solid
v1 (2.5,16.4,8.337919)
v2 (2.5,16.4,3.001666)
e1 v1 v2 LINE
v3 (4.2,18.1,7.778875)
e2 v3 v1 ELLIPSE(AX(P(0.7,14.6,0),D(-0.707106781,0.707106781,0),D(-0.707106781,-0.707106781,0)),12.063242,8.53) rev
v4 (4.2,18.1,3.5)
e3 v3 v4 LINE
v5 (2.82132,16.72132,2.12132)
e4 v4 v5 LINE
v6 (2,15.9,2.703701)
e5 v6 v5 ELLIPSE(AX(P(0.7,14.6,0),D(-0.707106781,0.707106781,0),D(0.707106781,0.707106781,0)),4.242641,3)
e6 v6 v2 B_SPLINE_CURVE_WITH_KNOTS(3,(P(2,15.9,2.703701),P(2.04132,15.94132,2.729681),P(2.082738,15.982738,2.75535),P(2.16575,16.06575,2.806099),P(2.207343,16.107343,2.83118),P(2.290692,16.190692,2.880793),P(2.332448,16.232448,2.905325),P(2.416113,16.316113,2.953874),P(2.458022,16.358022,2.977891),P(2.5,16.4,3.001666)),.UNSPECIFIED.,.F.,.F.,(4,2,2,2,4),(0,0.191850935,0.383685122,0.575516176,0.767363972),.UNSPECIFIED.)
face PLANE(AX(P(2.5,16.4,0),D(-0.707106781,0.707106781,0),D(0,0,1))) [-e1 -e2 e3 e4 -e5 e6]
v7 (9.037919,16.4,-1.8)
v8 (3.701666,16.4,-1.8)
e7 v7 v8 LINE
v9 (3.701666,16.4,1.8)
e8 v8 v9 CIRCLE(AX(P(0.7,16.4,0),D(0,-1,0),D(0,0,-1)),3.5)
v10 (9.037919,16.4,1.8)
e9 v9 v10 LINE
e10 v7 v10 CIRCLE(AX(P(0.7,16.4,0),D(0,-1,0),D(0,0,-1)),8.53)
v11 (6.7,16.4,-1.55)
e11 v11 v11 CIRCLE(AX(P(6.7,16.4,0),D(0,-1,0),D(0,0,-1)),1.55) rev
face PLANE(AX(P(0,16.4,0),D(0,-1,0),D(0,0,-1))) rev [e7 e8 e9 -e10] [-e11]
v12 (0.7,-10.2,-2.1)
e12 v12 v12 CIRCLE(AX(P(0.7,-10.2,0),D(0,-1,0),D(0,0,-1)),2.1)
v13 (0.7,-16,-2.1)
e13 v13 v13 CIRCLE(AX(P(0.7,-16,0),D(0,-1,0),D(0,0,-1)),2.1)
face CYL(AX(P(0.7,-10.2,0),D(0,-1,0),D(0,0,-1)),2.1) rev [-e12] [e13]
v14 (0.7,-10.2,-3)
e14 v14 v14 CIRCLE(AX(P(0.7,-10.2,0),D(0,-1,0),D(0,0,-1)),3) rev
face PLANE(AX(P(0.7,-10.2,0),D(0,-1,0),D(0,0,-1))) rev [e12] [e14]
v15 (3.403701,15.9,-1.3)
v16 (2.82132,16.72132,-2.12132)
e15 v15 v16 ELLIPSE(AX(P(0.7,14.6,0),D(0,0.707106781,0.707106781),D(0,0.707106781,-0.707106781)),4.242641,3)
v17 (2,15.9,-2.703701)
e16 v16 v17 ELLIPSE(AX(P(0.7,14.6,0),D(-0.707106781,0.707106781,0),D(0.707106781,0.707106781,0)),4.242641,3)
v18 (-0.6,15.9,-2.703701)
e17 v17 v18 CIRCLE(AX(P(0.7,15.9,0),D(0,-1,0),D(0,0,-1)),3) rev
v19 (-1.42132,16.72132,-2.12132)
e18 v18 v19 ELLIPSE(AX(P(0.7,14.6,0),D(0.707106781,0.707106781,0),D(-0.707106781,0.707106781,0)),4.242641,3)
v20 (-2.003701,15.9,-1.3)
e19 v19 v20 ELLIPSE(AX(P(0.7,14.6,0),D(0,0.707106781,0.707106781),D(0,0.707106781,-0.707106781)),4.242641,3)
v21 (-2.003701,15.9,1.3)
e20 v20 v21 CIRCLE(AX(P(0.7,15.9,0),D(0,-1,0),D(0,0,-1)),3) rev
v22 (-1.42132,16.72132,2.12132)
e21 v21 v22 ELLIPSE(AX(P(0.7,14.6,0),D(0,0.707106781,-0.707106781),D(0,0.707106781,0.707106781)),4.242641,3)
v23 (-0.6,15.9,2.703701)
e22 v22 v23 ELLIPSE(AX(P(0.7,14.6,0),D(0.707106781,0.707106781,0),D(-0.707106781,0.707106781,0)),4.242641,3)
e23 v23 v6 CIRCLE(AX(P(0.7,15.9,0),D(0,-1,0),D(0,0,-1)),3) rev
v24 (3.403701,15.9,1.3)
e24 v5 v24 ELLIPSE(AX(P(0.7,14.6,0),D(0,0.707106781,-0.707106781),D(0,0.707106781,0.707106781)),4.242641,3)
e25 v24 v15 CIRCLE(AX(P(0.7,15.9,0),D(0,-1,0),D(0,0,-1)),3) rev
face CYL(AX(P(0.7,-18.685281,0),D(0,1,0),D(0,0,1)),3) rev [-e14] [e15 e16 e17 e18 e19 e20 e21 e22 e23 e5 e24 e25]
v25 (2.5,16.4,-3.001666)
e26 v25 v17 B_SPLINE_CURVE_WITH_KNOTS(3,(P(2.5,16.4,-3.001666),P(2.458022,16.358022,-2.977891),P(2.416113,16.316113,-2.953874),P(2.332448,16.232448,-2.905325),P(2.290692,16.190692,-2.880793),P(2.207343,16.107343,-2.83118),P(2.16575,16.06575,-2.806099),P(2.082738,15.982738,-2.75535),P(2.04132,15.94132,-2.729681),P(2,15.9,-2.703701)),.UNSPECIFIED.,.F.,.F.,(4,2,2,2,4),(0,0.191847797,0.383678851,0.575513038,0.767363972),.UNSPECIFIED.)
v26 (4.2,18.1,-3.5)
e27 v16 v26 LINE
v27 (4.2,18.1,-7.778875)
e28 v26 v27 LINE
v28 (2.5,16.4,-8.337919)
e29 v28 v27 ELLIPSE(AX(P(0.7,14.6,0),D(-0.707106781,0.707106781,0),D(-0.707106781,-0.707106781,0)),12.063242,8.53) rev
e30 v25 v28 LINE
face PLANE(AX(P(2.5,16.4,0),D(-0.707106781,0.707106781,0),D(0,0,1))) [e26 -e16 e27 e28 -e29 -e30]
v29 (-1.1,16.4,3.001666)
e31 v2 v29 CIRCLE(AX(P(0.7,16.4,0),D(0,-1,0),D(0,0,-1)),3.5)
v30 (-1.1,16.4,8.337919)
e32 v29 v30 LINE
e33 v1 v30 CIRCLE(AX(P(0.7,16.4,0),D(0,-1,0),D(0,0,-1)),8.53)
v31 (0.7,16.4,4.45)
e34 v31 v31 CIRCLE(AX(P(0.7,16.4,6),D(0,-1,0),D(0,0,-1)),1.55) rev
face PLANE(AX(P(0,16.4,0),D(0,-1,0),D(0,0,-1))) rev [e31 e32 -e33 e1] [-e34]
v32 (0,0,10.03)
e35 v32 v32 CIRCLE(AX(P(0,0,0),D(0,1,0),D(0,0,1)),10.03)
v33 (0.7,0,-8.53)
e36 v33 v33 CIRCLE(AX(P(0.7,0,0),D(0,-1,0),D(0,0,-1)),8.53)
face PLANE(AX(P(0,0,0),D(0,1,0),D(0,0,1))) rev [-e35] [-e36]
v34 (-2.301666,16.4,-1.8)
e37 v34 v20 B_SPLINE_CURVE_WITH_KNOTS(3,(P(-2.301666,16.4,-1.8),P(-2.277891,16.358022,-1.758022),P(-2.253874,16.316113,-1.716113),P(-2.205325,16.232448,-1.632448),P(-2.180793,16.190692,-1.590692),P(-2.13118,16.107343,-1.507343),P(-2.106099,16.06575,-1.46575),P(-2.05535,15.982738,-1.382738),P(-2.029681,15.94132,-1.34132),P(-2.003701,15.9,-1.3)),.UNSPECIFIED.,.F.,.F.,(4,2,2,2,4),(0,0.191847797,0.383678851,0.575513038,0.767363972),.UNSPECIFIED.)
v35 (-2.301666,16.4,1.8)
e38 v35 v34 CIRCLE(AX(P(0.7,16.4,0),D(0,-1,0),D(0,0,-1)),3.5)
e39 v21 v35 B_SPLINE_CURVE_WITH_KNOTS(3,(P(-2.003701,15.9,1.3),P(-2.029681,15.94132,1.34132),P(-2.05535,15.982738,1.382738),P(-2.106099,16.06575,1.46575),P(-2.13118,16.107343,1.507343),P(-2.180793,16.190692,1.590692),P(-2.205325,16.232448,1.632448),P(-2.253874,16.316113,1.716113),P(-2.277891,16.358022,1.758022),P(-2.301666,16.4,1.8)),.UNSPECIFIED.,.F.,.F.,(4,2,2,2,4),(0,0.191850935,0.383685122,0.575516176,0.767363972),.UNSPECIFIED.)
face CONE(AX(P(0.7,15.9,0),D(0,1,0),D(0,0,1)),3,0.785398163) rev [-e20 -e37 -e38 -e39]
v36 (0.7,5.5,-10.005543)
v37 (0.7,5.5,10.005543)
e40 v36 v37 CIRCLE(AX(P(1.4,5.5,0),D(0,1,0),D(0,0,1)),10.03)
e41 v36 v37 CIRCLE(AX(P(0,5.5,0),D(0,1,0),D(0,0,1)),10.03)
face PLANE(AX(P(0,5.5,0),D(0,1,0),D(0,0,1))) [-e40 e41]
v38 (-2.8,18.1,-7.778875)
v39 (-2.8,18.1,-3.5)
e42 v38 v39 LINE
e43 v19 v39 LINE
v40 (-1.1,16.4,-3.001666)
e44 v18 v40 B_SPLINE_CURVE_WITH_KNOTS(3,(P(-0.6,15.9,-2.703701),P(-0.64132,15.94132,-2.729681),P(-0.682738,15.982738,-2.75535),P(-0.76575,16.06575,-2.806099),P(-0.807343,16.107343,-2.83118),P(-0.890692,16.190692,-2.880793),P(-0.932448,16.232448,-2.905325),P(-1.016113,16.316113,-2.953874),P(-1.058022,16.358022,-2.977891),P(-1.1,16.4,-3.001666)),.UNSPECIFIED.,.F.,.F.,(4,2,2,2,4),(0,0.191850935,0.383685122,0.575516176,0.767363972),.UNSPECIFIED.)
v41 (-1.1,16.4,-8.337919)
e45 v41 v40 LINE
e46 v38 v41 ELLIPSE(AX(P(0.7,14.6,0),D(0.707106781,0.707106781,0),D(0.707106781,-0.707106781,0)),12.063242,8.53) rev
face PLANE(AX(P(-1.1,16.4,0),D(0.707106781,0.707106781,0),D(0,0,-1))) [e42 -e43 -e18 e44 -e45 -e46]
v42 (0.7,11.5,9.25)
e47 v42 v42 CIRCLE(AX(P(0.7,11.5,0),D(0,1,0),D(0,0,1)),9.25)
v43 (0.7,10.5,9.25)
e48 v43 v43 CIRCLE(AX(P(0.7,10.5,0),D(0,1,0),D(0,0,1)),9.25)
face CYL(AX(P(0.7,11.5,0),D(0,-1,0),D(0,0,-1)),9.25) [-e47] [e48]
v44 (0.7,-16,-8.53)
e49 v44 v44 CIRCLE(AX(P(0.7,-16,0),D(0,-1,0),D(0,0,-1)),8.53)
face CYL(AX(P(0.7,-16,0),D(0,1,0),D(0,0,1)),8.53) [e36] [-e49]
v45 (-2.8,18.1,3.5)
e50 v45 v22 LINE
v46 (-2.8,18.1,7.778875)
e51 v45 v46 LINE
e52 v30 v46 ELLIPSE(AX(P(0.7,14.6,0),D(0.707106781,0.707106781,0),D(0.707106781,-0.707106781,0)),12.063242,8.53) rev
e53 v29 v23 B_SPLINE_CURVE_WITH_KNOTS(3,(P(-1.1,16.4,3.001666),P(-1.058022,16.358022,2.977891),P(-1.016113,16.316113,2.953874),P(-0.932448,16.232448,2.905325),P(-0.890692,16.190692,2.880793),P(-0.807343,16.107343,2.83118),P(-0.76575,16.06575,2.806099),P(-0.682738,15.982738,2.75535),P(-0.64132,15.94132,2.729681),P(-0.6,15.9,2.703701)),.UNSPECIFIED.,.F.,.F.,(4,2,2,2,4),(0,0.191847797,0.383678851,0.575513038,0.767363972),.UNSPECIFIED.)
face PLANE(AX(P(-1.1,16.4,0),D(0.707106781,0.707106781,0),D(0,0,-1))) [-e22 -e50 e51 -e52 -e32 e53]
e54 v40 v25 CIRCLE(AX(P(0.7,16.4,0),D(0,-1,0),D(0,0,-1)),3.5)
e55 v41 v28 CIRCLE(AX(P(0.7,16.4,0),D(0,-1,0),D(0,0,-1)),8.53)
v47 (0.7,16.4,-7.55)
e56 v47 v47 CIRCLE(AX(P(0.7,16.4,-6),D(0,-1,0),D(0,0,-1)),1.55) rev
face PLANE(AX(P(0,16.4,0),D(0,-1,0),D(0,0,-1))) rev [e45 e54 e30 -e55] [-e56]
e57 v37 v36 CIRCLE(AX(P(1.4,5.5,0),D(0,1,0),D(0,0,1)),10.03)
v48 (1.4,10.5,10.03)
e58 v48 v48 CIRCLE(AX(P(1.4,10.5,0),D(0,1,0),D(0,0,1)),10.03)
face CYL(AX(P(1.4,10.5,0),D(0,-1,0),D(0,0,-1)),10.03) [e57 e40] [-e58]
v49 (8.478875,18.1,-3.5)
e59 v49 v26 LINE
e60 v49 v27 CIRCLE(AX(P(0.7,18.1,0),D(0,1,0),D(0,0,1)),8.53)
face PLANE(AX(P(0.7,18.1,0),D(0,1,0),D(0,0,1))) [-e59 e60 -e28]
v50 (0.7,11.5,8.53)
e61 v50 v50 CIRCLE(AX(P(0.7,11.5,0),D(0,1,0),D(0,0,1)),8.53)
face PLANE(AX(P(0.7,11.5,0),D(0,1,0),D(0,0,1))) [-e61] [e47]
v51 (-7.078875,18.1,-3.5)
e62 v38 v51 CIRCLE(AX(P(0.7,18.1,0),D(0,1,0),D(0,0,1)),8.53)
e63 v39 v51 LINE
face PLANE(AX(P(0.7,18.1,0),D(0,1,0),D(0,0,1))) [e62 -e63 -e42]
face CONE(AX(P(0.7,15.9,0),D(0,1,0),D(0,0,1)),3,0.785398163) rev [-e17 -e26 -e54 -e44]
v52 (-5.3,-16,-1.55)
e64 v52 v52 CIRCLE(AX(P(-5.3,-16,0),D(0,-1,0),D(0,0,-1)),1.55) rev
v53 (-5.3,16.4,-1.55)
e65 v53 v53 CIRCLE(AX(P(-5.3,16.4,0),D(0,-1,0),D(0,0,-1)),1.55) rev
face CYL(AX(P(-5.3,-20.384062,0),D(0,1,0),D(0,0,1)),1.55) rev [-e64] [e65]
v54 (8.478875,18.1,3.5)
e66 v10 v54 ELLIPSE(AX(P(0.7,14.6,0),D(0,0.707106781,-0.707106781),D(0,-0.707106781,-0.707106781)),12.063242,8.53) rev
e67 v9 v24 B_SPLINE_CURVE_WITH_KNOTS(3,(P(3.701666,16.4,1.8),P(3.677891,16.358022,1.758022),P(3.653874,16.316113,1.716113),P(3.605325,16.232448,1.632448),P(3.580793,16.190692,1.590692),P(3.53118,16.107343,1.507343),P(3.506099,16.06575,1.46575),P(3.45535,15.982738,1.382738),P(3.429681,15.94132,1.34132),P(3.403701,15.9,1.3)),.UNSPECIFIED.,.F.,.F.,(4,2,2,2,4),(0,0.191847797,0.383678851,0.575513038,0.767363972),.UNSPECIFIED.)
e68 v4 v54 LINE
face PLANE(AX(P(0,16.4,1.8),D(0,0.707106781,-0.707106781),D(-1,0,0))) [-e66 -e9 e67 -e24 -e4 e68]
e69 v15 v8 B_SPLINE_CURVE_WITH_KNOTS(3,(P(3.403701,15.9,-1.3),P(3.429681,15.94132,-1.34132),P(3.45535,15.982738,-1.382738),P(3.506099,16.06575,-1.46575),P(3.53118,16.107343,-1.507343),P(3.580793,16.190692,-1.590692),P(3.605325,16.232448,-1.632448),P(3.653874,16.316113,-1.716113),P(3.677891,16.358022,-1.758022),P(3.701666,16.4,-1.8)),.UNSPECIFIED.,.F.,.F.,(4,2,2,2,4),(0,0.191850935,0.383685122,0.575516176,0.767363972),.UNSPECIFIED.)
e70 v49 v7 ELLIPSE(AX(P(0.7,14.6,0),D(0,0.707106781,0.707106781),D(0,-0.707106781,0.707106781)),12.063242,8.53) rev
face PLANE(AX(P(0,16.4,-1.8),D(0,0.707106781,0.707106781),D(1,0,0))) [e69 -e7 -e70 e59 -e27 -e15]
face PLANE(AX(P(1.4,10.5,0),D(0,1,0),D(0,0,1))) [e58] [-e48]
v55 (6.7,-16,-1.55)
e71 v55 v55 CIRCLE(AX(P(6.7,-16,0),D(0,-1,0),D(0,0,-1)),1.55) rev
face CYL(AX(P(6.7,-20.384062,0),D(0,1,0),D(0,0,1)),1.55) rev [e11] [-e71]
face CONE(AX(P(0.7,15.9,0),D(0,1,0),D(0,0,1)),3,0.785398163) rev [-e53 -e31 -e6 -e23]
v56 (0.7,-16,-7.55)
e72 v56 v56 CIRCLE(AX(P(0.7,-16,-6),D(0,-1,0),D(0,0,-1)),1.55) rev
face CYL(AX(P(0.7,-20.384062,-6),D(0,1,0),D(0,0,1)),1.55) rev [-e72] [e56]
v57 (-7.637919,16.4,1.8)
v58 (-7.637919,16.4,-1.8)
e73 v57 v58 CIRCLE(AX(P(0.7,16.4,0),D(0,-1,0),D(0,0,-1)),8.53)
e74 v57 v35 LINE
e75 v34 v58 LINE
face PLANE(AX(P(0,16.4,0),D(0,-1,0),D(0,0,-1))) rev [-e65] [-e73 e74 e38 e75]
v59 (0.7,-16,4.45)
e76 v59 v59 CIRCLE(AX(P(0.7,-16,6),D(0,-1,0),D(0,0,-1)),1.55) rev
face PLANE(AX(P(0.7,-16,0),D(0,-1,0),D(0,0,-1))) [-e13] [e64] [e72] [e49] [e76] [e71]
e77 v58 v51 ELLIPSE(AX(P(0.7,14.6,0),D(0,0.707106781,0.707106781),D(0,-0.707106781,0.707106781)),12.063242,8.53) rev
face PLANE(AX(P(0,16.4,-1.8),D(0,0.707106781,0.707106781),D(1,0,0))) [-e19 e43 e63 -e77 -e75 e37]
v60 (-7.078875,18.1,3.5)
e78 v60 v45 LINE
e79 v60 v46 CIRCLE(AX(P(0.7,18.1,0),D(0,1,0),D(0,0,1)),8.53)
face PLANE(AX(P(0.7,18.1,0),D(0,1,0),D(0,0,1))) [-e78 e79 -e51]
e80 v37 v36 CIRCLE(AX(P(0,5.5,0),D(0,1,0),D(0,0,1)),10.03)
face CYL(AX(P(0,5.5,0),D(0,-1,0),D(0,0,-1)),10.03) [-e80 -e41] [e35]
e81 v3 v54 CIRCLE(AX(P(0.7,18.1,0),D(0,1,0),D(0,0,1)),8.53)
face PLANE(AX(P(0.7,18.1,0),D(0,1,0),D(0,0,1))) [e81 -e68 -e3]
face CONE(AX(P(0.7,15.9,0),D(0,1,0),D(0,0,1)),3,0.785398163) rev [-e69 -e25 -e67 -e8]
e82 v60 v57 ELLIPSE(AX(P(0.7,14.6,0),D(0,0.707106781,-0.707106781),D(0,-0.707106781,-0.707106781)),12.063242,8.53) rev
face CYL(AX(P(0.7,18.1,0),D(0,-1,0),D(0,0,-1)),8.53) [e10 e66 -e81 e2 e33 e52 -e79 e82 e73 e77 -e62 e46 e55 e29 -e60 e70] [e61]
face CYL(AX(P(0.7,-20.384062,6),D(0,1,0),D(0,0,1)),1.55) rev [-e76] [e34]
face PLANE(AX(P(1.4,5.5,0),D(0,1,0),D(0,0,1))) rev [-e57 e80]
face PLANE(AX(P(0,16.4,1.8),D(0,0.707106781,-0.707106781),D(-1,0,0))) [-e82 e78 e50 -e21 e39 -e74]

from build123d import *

# Parameters (mm, degrees)
SKETCH1_R            = 10.03
BOSS_EXTRUDE11_DEPTH = 5.5
SKETCH20_R           = 10.03
BOSS_EXTRUDE12_DEPTH = 5
SKETCH21_R           = 9.25
BOSS_EXTRUDE13_DEPTH = 1
SKETCH22_R           = 8.53
BOSS_EXTRUDE14_DEPTH = 6.6
BOSS_EXTRUDE15_START = 16
SKETCH30_R           = 8.53
BOSS_EXTRUDE15_DEPTH = 16
SKETCH31_R           = 1.55
CUT_EXTRUDE12_DEPTH  = 34.1
SKETCH33_R           = 2.1
CUT_EXTRUDE14_DEPTH  = 5.8
SKETCH36_R           = 3
CUT_EXTRUDE18_DEPTH  = 28.3
SKETCH37_W           = 9.5
SKETCH37_H           = 7
CUT_EXTRUDE19_DEPTH  = 1.7
CIRPATTERN1_COUNT    = 4
CHAMFER1_SIZE        = 1.7
CHAMFER2_SIZE        = 0.5


with BuildPart() as part:
    # Sketch1 → Boss-Extrude11 (new body)
    with BuildSketch(Plane(origin=(0, 0, 0), x_dir=(1, 0, 0), z_dir=(0, 1, 0))):
        with Locations(Location((0, 0, 0), (0, 0, 270))):
            Circle(SKETCH1_R)
    extrude(amount=BOSS_EXTRUDE11_DEPTH)

    # Sketch20 → Boss-Extrude12 (add)
    with BuildSketch(Plane(origin=(0, 5.5, 0), x_dir=(1, 0, 0), z_dir=(0, 1, 0))):
        with Locations(Location((1.4, 0, 0), (0, 0, 94.001961682))):
            Circle(SKETCH20_R)
    extrude(amount=BOSS_EXTRUDE12_DEPTH)

    # Sketch21 → Boss-Extrude13 (add)
    with BuildSketch(Plane(origin=(0, 10.5, 0), x_dir=(1, 0, 0), z_dir=(0, 1, 0))):
        with Locations(Location((0.7, 0, 0), (0, 0, 270))):
            Circle(SKETCH21_R)
    extrude(amount=BOSS_EXTRUDE13_DEPTH)

    # Sketch22 → Boss-Extrude14 (add)
    with BuildSketch(Plane(origin=(0, 11.5, 0), x_dir=(1, 0, 0), z_dir=(0, 1, 0))):
        with Locations(Location((0.7, 0, 0), (0, 0, 270))):
            Circle(SKETCH22_R)
    extrude(amount=BOSS_EXTRUDE14_DEPTH)

    # Sketch30 → Boss-Extrude15 (add)
    with BuildSketch(Plane.XZ.offset(BOSS_EXTRUDE15_START)):
        with Locations(Location((0.7, 0, 0), (0, 0, 90))):
            Circle(SKETCH30_R)
    extrude(amount=-BOSS_EXTRUDE15_DEPTH)

    # Sketch31 → Cut-Extrude12 (cut)
    with BuildSketch(Plane(origin=(0, 18.1, 0), x_dir=(1, 0, 0), z_dir=(0, 1, 0))):
        with Locations(Location((6.7, 0, 0), (0, 0, 270))):
            Circle(SKETCH31_R)
    cut_extrude12 = extrude(amount=-CUT_EXTRUDE12_DEPTH, mode=Mode.SUBTRACT)

    # Sketch33 → Cut-Extrude14 (cut)
    with BuildSketch(Plane.XZ.offset(16)):
        with Locations(Location((0.7, 0, 0), (0, 0, 270))):
            Circle(SKETCH33_R)
    extrude(amount=-CUT_EXTRUDE14_DEPTH, mode=Mode.SUBTRACT)

    # Sketch36 → Cut-Extrude18 (cut)
    with BuildSketch(Plane(origin=(0, 18.1, 0), x_dir=(1, 0, 0), z_dir=(0, 1, 0))):
        with Locations(Location((0.7, 0, 0), (0, 0, 270))):
            Circle(SKETCH36_R)
    extrude(amount=-CUT_EXTRUDE18_DEPTH, mode=Mode.SUBTRACT)

    # Sketch37 → Cut-Extrude19 (cut)
    with BuildSketch(Plane(origin=(0, 18.1, 0), x_dir=(1, 0, 0), z_dir=(0, 1, 0))):
        with Locations((5.45, 0)):
            Rectangle(SKETCH37_W, SKETCH37_H)
    cut_extrude19 = extrude(amount=-CUT_EXTRUDE19_DEPTH, mode=Mode.SUBTRACT)

    # CirPattern1: Cut-Extrude12, Cut-Extrude19 ×4 about axis
    cirpattern1_axis = Axis((0.7, 0, 0), (0, 1, 0))
    add([cut_extrude12.rotate(cirpattern1_axis, i * 360 / CIRPATTERN1_COUNT) for i in range(1, CIRPATTERN1_COUNT)], mode=Mode.SUBTRACT)
    add([cut_extrude19.rotate(cirpattern1_axis, i * 360 / CIRPATTERN1_COUNT) for i in range(1, CIRPATTERN1_COUNT)], mode=Mode.SUBTRACT)

    # Chamfer1
    # the kernel refuses this chamfer: 1.7 mm, written as the material it adds along each edge
    with BuildSketch(Plane(origin=(12.85073632, 16.4, -3.5), x_dir=(0, 0.9996219169112968, -0.027495876610586365), z_dir=(-1, 0, 0))) as chamfer1_piece_1_section:
        Polygon((CHAMFER1_SIZE * 0.999621916911, -CHAMFER1_SIZE * 0.0274958766106), (-CHAMFER1_SIZE * 0.0274958766106, -CHAMFER1_SIZE * 0.999621916911), (0, 0), align=None)
    chamfer1_piece_1 = extrude(amount=8.65073632, mode=Mode.PRIVATE)
    chamfer1_piece_1 = chamfer1_piece_1 & Plane(origin=(0.7, 16.951076754, 0), x_dir=(0, 0, 1), z_dir=(0, -1, 0)) * Cylinder(8.53, 25, mode=Mode.PRIVATE)
    chamfer1_piece_1 = split(chamfer1_piece_1, bisect_by=Plane(origin=(6.450066767, 18.1, -2.924017163), z_dir=(0, -1, 0)), keep=Keep.TOP, mode=Mode.PRIVATE)
    add(chamfer1_piece_1)
    with BuildSketch(Plane(origin=(4.2, 16.4, 3.5), x_dir=(0, 0.9996219169112968, 0.027495876610581792), z_dir=(1, 0, 0))) as chamfer1_piece_2_section:
        Polygon((CHAMFER1_SIZE * 0.999621916911, -CHAMFER1_SIZE * 0.0274958766106), (-CHAMFER1_SIZE * 0.0274958766106, -CHAMFER1_SIZE * 0.999621916911), (0, 0), align=None)
    chamfer1_piece_2 = extrude(amount=8.65073632, mode=Mode.PRIVATE)
    chamfer1_piece_2 = chamfer1_piece_2 & Plane(origin=(0.7, 16.951076754, 0), x_dir=(0, 0, 1), z_dir=(0, -1, 0)) * Cylinder(8.53, 25, mode=Mode.PRIVATE)
    chamfer1_piece_2 = split(chamfer1_piece_2, bisect_by=Plane(origin=(6.450066768, 18.1, 2.924017163), z_dir=(0, -1, 0)), keep=Keep.TOP, mode=Mode.PRIVATE)
    add(chamfer1_piece_2)
    with BuildSketch(Plane(origin=(-2.8, 16.4, -12.15073632), x_dir=(-0.027495876610586365, 0.9996219169112968, 0), z_dir=(0, 0, 1))) as chamfer1_piece_3_section:
        Polygon((CHAMFER1_SIZE * 0.999621916911, -CHAMFER1_SIZE * 0.0274958766106), (-CHAMFER1_SIZE * 0.0274958766106, -CHAMFER1_SIZE * 0.999621916911), (0, 0), align=None)
    chamfer1_piece_3 = extrude(amount=8.65073632, mode=Mode.PRIVATE)
    chamfer1_piece_3 = chamfer1_piece_3 & Plane(origin=(0.7, 16.951076754, 0), x_dir=(0, 0, 1), z_dir=(0, -1, 0)) * Cylinder(8.53, 25, mode=Mode.PRIVATE)
    chamfer1_piece_3 = split(chamfer1_piece_3, bisect_by=Plane(origin=(-2.224017163, 18.1, -5.750066767), z_dir=(0, -1, 0)), keep=Keep.TOP, mode=Mode.PRIVATE)
    add(chamfer1_piece_3)
    with BuildSketch(Plane(origin=(-2.8, 16.4, -3.5), x_dir=(0, 0.9996219169112968, -0.027495876610586365), z_dir=(-1, 0, 0))) as chamfer1_piece_4_section:
        Polygon((CHAMFER1_SIZE * 0.999621916911, -CHAMFER1_SIZE * 0.0274958766106), (-CHAMFER1_SIZE * 0.0274958766106, -CHAMFER1_SIZE * 0.999621916911), (0, 0), align=None)
    chamfer1_piece_4 = extrude(amount=8.65073632, mode=Mode.PRIVATE)
    chamfer1_piece_4 = chamfer1_piece_4 & Plane(origin=(0.7, 16.951076754, 0), x_dir=(0, 0, 1), z_dir=(0, -1, 0)) * Cylinder(8.53, 25, mode=Mode.PRIVATE)
    chamfer1_piece_4 = split(chamfer1_piece_4, bisect_by=Plane(origin=(-5.050066768, 18.1, -2.924017163), z_dir=(0, -1, 0)), keep=Keep.TOP, mode=Mode.PRIVATE)
    add(chamfer1_piece_4)
    with BuildSketch(Plane(origin=(-11.45073632, 16.4, 3.5), x_dir=(0, 0.9996219169112968, 0.027495876610586365), z_dir=(1, 0, 0))) as chamfer1_piece_5_section:
        Polygon((CHAMFER1_SIZE * 0.999621916911, -CHAMFER1_SIZE * 0.0274958766106), (-CHAMFER1_SIZE * 0.0274958766106, -CHAMFER1_SIZE * 0.999621916911), (0, 0), align=None)
    chamfer1_piece_5 = extrude(amount=8.65073632, mode=Mode.PRIVATE)
    chamfer1_piece_5 = chamfer1_piece_5 & Plane(origin=(0.7, 16.951076754, 0), x_dir=(0, 0, 1), z_dir=(0, -1, 0)) * Cylinder(8.53, 25, mode=Mode.PRIVATE)
    chamfer1_piece_5 = split(chamfer1_piece_5, bisect_by=Plane(origin=(-5.050066767, 18.1, 2.924017163), z_dir=(0, -1, 0)), keep=Keep.TOP, mode=Mode.PRIVATE)
    add(chamfer1_piece_5)
    with BuildSketch(Plane(origin=(-2.8, 16.4, 3.5), x_dir=(-0.027495876610586365, 0.9996219169112968, 0), z_dir=(0, 0, 1))) as chamfer1_piece_6_section:
        Polygon((CHAMFER1_SIZE * 0.999621916911, -CHAMFER1_SIZE * 0.0274958766106), (-CHAMFER1_SIZE * 0.0274958766106, -CHAMFER1_SIZE * 0.999621916911), (0, 0), align=None)
    chamfer1_piece_6 = extrude(amount=8.65073632, mode=Mode.PRIVATE)
    chamfer1_piece_6 = chamfer1_piece_6 & Plane(origin=(0.7, 16.951076754, 0), x_dir=(0, 0, 1), z_dir=(0, -1, 0)) * Cylinder(8.53, 25, mode=Mode.PRIVATE)
    chamfer1_piece_6 = split(chamfer1_piece_6, bisect_by=Plane(origin=(-2.224017163, 18.1, 5.750066768), z_dir=(0, -1, 0)), keep=Keep.TOP, mode=Mode.PRIVATE)
    add(chamfer1_piece_6)
    with BuildSketch(Plane(origin=(4.2, 16.4, 12.15073632), x_dir=(0.027495876610586365, 0.9996219169112968, 0), z_dir=(0, 0, -1))) as chamfer1_piece_7_section:
        Polygon((CHAMFER1_SIZE * 0.999621916911, -CHAMFER1_SIZE * 0.0274958766106), (-CHAMFER1_SIZE * 0.0274958766106, -CHAMFER1_SIZE * 0.999621916911), (0, 0), align=None)
    chamfer1_piece_7 = extrude(amount=8.65073632, mode=Mode.PRIVATE)
    chamfer1_piece_7 = chamfer1_piece_7 & Plane(origin=(0.7, 16.951076754, 0), x_dir=(0, 0, 1), z_dir=(0, -1, 0)) * Cylinder(8.53, 25, mode=Mode.PRIVATE)
    chamfer1_piece_7 = split(chamfer1_piece_7, bisect_by=Plane(origin=(3.624017163, 18.1, 5.750066767), z_dir=(0, -1, 0)), keep=Keep.TOP, mode=Mode.PRIVATE)
    add(chamfer1_piece_7)
    with BuildSketch(Plane(origin=(4.2, 16.4, -3.5), x_dir=(0.027495876610586365, 0.9996219169112968, 0), z_dir=(0, 0, -1))) as chamfer1_piece_8_section:
        Polygon((CHAMFER1_SIZE * 0.999621916911, -CHAMFER1_SIZE * 0.0274958766106), (-CHAMFER1_SIZE * 0.0274958766106, -CHAMFER1_SIZE * 0.999621916911), (0, 0), align=None)
    chamfer1_piece_8 = extrude(amount=8.65073632, mode=Mode.PRIVATE)
    chamfer1_piece_8 = chamfer1_piece_8 & Plane(origin=(0.7, 16.951076754, 0), x_dir=(0, 0, 1), z_dir=(0, -1, 0)) * Cylinder(8.53, 25, mode=Mode.PRIVATE)
    chamfer1_piece_8 = split(chamfer1_piece_8, bisect_by=Plane(origin=(3.624017163, 18.1, -5.750066768), z_dir=(0, -1, 0)), keep=Keep.TOP, mode=Mode.PRIVATE)
    add(chamfer1_piece_8)
    with BuildSketch(Plane(origin=(12.85073632, 16.4, -3.5), x_dir=(0, 0.9996219169112968, -0.027495876610586365), z_dir=(-1, 0, 0))) as chamfer1_piece_9a_section:
        Polygon((CHAMFER1_SIZE * 0.999621916911, -CHAMFER1_SIZE * 0.0274958766106), (-CHAMFER1_SIZE * 0.0274958766106, -CHAMFER1_SIZE * 0.999621916911), (0, 0), align=None)
    chamfer1_piece_9a = extrude(amount=13.022597399, mode=Mode.PRIVATE)
    chamfer1_piece_9a = split(chamfer1_piece_9a, bisect_by=Plane(origin=(2.33024723, 18.1, -3.085534958), z_dir=(0, -1, 0)), keep=Keep.TOP, mode=Mode.PRIVATE)
    chamfer1_piece_9a = split(chamfer1_piece_9a, bisect_by=Plane(origin=(4.2, 17.035605809, -3.085534958), z_dir=(-1, 0, 0)), keep=Keep.TOP, mode=Mode.PRIVATE)
    chamfer1_piece_9a = chamfer1_piece_9a - Plane(origin=(0.7, 17.035605809, 0), x_dir=(0, 0, 1), z_dir=(0, 1, 0)) * Cylinder(3, 33, mode=Mode.PRIVATE)
    with BuildSketch(Plane(origin=(4.2, 16.4, 0.87186108), x_dir=(0.027495876610586365, 0.9996219169112968, 0), z_dir=(0, 0, -1))) as chamfer1_piece_9b_section:
        Polygon((CHAMFER1_SIZE * 0.999621916911, -CHAMFER1_SIZE * 0.0274958766106), (-CHAMFER1_SIZE * 0.0274958766106, -CHAMFER1_SIZE * 0.999621916911), (0, 0), align=None)
    chamfer1_piece_9b = extrude(amount=13.022597399, mode=Mode.PRIVATE)
    chamfer1_piece_9b = split(chamfer1_piece_9b, bisect_by=Plane(origin=(3.785535078, 17.035605902, -3.5), z_dir=(0, 0, 1)), keep=Keep.TOP, mode=Mode.PRIVATE)
    chamfer1_piece_9b = split(chamfer1_piece_9b, bisect_by=Plane(origin=(3.785535078, 18.1, -1.630247283), z_dir=(0, -1, 0)), keep=Keep.TOP, mode=Mode.PRIVATE)
    chamfer1_piece_9b = chamfer1_piece_9b - Plane(origin=(0.7, 17.035605902, 0), x_dir=(0, 0, 1), z_dir=(0, 1, 0)) * Cylinder(3, 33, mode=Mode.PRIVATE)
    chamfer1_piece_9 = chamfer1_piece_9a & chamfer1_piece_9b
    add(chamfer1_piece_9)
    with BuildSketch(Plane(origin=(4.2, 16.4, 12.15073632), x_dir=(0.027495876610586365, 0.9996219169112968, 0), z_dir=(0, 0, -1))) as chamfer1_piece_10a_section:
        Polygon((CHAMFER1_SIZE * 0.999621916911, -CHAMFER1_SIZE * 0.0274958766106), (-CHAMFER1_SIZE * 0.0274958766106, -CHAMFER1_SIZE * 0.999621916911), (0, 0), align=None)
    chamfer1_piece_10a = extrude(amount=13.022597399, mode=Mode.PRIVATE)
    chamfer1_piece_10a = split(chamfer1_piece_10a, bisect_by=Plane(origin=(3.785534958, 18.1, 1.63024723), z_dir=(0, -1, 0)), keep=Keep.TOP, mode=Mode.PRIVATE)
    chamfer1_piece_10a = split(chamfer1_piece_10a, bisect_by=Plane(origin=(3.785534958, 17.035605809, 3.5), z_dir=(0, 0, -1)), keep=Keep.TOP, mode=Mode.PRIVATE)
    chamfer1_piece_10a = chamfer1_piece_10a - Plane(origin=(0.7, 17.035605809, 0), x_dir=(0, 0, 1), z_dir=(0, 1, 0)) * Cylinder(3, 33, mode=Mode.PRIVATE)
    with BuildSketch(Plane(origin=(-0.17186108, 16.4, 3.5), x_dir=(0, 0.9996219169112968, 0.027495876610586365), z_dir=(1, 0, 0))) as chamfer1_piece_10b_section:
        Polygon((CHAMFER1_SIZE * 0.999621916911, -CHAMFER1_SIZE * 0.0274958766106), (-CHAMFER1_SIZE * 0.0274958766106, -CHAMFER1_SIZE * 0.999621916911), (0, 0), align=None)
    chamfer1_piece_10b = extrude(amount=13.022597399, mode=Mode.PRIVATE)
    chamfer1_piece_10b = split(chamfer1_piece_10b, bisect_by=Plane(origin=(4.2, 17.035605903, 3.08553508), z_dir=(-1, 0, 0)), keep=Keep.TOP, mode=Mode.PRIVATE)
    chamfer1_piece_10b = split(chamfer1_piece_10b, bisect_by=Plane(origin=(2.330247274, 18.1, 3.08553508), z_dir=(0, -1, 0)), keep=Keep.TOP, mode=Mode.PRIVATE)
    chamfer1_piece_10b = chamfer1_piece_10b - Plane(origin=(0.7, 17.035605903, 0), x_dir=(0, 0, 1), z_dir=(0, 1, 0)) * Cylinder(3, 33, mode=Mode.PRIVATE)
    chamfer1_piece_10 = chamfer1_piece_10a & chamfer1_piece_10b
    add(chamfer1_piece_10)
    with BuildSketch(Plane(origin=(-2.8, 16.4, -12.15073632), x_dir=(-0.027495876610586365, 0.9996219169112968, 0), z_dir=(0, 0, 1))) as chamfer1_piece_11a_section:
        Polygon((CHAMFER1_SIZE * 0.999621916911, -CHAMFER1_SIZE * 0.0274958766106), (-CHAMFER1_SIZE * 0.0274958766106, -CHAMFER1_SIZE * 0.999621916911), (0, 0), align=None)
    chamfer1_piece_11a = extrude(amount=13.022597399, mode=Mode.PRIVATE)
    chamfer1_piece_11a = split(chamfer1_piece_11a, bisect_by=Plane(origin=(-2.385534958, 18.1, -1.63024723), z_dir=(0, -1, 0)), keep=Keep.TOP, mode=Mode.PRIVATE)
    chamfer1_piece_11a = split(chamfer1_piece_11a, bisect_by=Plane(origin=(-2.385534958, 17.035605809, -3.5), z_dir=(0, 0, 1)), keep=Keep.TOP, mode=Mode.PRIVATE)
    chamfer1_piece_11a = chamfer1_piece_11a - Plane(origin=(0.7, 17.035605809, 0), x_dir=(0, 0, 1), z_dir=(0, 1, 0)) * Cylinder(3, 33, mode=Mode.PRIVATE)
    with BuildSketch(Plane(origin=(1.57186108, 16.4, -3.5), x_dir=(0, 0.9996219169112968, -0.027495876610586365), z_dir=(-1, 0, 0))) as chamfer1_piece_11b_section:
        Polygon((CHAMFER1_SIZE * 0.999621916911, -CHAMFER1_SIZE * 0.0274958766106), (-CHAMFER1_SIZE * 0.0274958766106, -CHAMFER1_SIZE * 0.999621916911), (0, 0), align=None)
    chamfer1_piece_11b = extrude(amount=13.022597399, mode=Mode.PRIVATE)
    chamfer1_piece_11b = split(chamfer1_piece_11b, bisect_by=Plane(origin=(-2.8, 17.035605902, -3.085535078), z_dir=(1, 0, 0)), keep=Keep.TOP, mode=Mode.PRIVATE)
    chamfer1_piece_11b = split(chamfer1_piece_11b, bisect_by=Plane(origin=(-0.930247283, 18.1, -3.085535078), z_dir=(0, -1, 0)), keep=Keep.TOP, mode=Mode.PRIVATE)
    chamfer1_piece_11b = chamfer1_piece_11b - Plane(origin=(0.7, 17.035605902, 0), x_dir=(0, 0, 1), z_dir=(0, 1, 0)) * Cylinder(3, 33, mode=Mode.PRIVATE)
    chamfer1_piece_11 = chamfer1_piece_11a & chamfer1_piece_11b
    add(chamfer1_piece_11)
    with BuildSketch(Plane(origin=(-11.45073632, 16.4, 3.5), x_dir=(0, 0.9996219169112968, 0.027495876610586365), z_dir=(1, 0, 0))) as chamfer1_piece_12a_section:
        Polygon((CHAMFER1_SIZE * 0.999621916911, -CHAMFER1_SIZE * 0.0274958766106), (-CHAMFER1_SIZE * 0.0274958766106, -CHAMFER1_SIZE * 0.999621916911), (0, 0), align=None)
    chamfer1_piece_12a = extrude(amount=13.022597399, mode=Mode.PRIVATE)
    chamfer1_piece_12a = split(chamfer1_piece_12a, bisect_by=Plane(origin=(-0.930247276, 18.1, 3.08553506), z_dir=(0, -1, 0)), keep=Keep.TOP, mode=Mode.PRIVATE)
    chamfer1_piece_12a = split(chamfer1_piece_12a, bisect_by=Plane(origin=(-2.8, 17.035605889, 3.08553506), z_dir=(1, 0, 0)), keep=Keep.TOP, mode=Mode.PRIVATE)
    chamfer1_piece_12a = chamfer1_piece_12a - Plane(origin=(0.7, 17.035605889, 0), x_dir=(0, 0, 1), z_dir=(0, 1, 0)) * Cylinder(3, 33, mode=Mode.PRIVATE)
    with BuildSketch(Plane(origin=(-2.8, 16.4, -0.87186108), x_dir=(-0.027495876610586365, 0.9996219169112968, 0), z_dir=(0, 0, 1))) as chamfer1_piece_12b_section:
        Polygon((CHAMFER1_SIZE * 0.999621916911, -CHAMFER1_SIZE * 0.0274958766106), (-CHAMFER1_SIZE * 0.0274958766106, -CHAMFER1_SIZE * 0.999621916911), (0, 0), align=None)
    chamfer1_piece_12b = extrude(amount=13.022597399, mode=Mode.PRIVATE)
    chamfer1_piece_12b = split(chamfer1_piece_12b, bisect_by=Plane(origin=(-2.385535078, 17.035605902, 3.5), z_dir=(0, 0, -1)), keep=Keep.TOP, mode=Mode.PRIVATE)
    chamfer1_piece_12b = split(chamfer1_piece_12b, bisect_by=Plane(origin=(-2.385535078, 18.1, 1.630247283), z_dir=(0, -1, 0)), keep=Keep.TOP, mode=Mode.PRIVATE)
    chamfer1_piece_12b = chamfer1_piece_12b - Plane(origin=(0.7, 17.035605902, 0), x_dir=(0, 0, 1), z_dir=(0, 1, 0)) * Cylinder(3, 33, mode=Mode.PRIVATE)
    chamfer1_piece_12 = chamfer1_piece_12a & chamfer1_piece_12b
    add(chamfer1_piece_12)

    # Chamfer2
    chamfer2_edges = [part.edges().sort_by_distance(p)[0] for p in [
        (-2.3, 16.4, 0),
        (1.648683298, 16.4, 2.846049894),
        (3.7, 16.4, 0),
        (0.7, 16.4, -3),
    ]]
    chamfer(chamfer2_edges, length=CHAMFER2_SIZE)


solid = part.part
